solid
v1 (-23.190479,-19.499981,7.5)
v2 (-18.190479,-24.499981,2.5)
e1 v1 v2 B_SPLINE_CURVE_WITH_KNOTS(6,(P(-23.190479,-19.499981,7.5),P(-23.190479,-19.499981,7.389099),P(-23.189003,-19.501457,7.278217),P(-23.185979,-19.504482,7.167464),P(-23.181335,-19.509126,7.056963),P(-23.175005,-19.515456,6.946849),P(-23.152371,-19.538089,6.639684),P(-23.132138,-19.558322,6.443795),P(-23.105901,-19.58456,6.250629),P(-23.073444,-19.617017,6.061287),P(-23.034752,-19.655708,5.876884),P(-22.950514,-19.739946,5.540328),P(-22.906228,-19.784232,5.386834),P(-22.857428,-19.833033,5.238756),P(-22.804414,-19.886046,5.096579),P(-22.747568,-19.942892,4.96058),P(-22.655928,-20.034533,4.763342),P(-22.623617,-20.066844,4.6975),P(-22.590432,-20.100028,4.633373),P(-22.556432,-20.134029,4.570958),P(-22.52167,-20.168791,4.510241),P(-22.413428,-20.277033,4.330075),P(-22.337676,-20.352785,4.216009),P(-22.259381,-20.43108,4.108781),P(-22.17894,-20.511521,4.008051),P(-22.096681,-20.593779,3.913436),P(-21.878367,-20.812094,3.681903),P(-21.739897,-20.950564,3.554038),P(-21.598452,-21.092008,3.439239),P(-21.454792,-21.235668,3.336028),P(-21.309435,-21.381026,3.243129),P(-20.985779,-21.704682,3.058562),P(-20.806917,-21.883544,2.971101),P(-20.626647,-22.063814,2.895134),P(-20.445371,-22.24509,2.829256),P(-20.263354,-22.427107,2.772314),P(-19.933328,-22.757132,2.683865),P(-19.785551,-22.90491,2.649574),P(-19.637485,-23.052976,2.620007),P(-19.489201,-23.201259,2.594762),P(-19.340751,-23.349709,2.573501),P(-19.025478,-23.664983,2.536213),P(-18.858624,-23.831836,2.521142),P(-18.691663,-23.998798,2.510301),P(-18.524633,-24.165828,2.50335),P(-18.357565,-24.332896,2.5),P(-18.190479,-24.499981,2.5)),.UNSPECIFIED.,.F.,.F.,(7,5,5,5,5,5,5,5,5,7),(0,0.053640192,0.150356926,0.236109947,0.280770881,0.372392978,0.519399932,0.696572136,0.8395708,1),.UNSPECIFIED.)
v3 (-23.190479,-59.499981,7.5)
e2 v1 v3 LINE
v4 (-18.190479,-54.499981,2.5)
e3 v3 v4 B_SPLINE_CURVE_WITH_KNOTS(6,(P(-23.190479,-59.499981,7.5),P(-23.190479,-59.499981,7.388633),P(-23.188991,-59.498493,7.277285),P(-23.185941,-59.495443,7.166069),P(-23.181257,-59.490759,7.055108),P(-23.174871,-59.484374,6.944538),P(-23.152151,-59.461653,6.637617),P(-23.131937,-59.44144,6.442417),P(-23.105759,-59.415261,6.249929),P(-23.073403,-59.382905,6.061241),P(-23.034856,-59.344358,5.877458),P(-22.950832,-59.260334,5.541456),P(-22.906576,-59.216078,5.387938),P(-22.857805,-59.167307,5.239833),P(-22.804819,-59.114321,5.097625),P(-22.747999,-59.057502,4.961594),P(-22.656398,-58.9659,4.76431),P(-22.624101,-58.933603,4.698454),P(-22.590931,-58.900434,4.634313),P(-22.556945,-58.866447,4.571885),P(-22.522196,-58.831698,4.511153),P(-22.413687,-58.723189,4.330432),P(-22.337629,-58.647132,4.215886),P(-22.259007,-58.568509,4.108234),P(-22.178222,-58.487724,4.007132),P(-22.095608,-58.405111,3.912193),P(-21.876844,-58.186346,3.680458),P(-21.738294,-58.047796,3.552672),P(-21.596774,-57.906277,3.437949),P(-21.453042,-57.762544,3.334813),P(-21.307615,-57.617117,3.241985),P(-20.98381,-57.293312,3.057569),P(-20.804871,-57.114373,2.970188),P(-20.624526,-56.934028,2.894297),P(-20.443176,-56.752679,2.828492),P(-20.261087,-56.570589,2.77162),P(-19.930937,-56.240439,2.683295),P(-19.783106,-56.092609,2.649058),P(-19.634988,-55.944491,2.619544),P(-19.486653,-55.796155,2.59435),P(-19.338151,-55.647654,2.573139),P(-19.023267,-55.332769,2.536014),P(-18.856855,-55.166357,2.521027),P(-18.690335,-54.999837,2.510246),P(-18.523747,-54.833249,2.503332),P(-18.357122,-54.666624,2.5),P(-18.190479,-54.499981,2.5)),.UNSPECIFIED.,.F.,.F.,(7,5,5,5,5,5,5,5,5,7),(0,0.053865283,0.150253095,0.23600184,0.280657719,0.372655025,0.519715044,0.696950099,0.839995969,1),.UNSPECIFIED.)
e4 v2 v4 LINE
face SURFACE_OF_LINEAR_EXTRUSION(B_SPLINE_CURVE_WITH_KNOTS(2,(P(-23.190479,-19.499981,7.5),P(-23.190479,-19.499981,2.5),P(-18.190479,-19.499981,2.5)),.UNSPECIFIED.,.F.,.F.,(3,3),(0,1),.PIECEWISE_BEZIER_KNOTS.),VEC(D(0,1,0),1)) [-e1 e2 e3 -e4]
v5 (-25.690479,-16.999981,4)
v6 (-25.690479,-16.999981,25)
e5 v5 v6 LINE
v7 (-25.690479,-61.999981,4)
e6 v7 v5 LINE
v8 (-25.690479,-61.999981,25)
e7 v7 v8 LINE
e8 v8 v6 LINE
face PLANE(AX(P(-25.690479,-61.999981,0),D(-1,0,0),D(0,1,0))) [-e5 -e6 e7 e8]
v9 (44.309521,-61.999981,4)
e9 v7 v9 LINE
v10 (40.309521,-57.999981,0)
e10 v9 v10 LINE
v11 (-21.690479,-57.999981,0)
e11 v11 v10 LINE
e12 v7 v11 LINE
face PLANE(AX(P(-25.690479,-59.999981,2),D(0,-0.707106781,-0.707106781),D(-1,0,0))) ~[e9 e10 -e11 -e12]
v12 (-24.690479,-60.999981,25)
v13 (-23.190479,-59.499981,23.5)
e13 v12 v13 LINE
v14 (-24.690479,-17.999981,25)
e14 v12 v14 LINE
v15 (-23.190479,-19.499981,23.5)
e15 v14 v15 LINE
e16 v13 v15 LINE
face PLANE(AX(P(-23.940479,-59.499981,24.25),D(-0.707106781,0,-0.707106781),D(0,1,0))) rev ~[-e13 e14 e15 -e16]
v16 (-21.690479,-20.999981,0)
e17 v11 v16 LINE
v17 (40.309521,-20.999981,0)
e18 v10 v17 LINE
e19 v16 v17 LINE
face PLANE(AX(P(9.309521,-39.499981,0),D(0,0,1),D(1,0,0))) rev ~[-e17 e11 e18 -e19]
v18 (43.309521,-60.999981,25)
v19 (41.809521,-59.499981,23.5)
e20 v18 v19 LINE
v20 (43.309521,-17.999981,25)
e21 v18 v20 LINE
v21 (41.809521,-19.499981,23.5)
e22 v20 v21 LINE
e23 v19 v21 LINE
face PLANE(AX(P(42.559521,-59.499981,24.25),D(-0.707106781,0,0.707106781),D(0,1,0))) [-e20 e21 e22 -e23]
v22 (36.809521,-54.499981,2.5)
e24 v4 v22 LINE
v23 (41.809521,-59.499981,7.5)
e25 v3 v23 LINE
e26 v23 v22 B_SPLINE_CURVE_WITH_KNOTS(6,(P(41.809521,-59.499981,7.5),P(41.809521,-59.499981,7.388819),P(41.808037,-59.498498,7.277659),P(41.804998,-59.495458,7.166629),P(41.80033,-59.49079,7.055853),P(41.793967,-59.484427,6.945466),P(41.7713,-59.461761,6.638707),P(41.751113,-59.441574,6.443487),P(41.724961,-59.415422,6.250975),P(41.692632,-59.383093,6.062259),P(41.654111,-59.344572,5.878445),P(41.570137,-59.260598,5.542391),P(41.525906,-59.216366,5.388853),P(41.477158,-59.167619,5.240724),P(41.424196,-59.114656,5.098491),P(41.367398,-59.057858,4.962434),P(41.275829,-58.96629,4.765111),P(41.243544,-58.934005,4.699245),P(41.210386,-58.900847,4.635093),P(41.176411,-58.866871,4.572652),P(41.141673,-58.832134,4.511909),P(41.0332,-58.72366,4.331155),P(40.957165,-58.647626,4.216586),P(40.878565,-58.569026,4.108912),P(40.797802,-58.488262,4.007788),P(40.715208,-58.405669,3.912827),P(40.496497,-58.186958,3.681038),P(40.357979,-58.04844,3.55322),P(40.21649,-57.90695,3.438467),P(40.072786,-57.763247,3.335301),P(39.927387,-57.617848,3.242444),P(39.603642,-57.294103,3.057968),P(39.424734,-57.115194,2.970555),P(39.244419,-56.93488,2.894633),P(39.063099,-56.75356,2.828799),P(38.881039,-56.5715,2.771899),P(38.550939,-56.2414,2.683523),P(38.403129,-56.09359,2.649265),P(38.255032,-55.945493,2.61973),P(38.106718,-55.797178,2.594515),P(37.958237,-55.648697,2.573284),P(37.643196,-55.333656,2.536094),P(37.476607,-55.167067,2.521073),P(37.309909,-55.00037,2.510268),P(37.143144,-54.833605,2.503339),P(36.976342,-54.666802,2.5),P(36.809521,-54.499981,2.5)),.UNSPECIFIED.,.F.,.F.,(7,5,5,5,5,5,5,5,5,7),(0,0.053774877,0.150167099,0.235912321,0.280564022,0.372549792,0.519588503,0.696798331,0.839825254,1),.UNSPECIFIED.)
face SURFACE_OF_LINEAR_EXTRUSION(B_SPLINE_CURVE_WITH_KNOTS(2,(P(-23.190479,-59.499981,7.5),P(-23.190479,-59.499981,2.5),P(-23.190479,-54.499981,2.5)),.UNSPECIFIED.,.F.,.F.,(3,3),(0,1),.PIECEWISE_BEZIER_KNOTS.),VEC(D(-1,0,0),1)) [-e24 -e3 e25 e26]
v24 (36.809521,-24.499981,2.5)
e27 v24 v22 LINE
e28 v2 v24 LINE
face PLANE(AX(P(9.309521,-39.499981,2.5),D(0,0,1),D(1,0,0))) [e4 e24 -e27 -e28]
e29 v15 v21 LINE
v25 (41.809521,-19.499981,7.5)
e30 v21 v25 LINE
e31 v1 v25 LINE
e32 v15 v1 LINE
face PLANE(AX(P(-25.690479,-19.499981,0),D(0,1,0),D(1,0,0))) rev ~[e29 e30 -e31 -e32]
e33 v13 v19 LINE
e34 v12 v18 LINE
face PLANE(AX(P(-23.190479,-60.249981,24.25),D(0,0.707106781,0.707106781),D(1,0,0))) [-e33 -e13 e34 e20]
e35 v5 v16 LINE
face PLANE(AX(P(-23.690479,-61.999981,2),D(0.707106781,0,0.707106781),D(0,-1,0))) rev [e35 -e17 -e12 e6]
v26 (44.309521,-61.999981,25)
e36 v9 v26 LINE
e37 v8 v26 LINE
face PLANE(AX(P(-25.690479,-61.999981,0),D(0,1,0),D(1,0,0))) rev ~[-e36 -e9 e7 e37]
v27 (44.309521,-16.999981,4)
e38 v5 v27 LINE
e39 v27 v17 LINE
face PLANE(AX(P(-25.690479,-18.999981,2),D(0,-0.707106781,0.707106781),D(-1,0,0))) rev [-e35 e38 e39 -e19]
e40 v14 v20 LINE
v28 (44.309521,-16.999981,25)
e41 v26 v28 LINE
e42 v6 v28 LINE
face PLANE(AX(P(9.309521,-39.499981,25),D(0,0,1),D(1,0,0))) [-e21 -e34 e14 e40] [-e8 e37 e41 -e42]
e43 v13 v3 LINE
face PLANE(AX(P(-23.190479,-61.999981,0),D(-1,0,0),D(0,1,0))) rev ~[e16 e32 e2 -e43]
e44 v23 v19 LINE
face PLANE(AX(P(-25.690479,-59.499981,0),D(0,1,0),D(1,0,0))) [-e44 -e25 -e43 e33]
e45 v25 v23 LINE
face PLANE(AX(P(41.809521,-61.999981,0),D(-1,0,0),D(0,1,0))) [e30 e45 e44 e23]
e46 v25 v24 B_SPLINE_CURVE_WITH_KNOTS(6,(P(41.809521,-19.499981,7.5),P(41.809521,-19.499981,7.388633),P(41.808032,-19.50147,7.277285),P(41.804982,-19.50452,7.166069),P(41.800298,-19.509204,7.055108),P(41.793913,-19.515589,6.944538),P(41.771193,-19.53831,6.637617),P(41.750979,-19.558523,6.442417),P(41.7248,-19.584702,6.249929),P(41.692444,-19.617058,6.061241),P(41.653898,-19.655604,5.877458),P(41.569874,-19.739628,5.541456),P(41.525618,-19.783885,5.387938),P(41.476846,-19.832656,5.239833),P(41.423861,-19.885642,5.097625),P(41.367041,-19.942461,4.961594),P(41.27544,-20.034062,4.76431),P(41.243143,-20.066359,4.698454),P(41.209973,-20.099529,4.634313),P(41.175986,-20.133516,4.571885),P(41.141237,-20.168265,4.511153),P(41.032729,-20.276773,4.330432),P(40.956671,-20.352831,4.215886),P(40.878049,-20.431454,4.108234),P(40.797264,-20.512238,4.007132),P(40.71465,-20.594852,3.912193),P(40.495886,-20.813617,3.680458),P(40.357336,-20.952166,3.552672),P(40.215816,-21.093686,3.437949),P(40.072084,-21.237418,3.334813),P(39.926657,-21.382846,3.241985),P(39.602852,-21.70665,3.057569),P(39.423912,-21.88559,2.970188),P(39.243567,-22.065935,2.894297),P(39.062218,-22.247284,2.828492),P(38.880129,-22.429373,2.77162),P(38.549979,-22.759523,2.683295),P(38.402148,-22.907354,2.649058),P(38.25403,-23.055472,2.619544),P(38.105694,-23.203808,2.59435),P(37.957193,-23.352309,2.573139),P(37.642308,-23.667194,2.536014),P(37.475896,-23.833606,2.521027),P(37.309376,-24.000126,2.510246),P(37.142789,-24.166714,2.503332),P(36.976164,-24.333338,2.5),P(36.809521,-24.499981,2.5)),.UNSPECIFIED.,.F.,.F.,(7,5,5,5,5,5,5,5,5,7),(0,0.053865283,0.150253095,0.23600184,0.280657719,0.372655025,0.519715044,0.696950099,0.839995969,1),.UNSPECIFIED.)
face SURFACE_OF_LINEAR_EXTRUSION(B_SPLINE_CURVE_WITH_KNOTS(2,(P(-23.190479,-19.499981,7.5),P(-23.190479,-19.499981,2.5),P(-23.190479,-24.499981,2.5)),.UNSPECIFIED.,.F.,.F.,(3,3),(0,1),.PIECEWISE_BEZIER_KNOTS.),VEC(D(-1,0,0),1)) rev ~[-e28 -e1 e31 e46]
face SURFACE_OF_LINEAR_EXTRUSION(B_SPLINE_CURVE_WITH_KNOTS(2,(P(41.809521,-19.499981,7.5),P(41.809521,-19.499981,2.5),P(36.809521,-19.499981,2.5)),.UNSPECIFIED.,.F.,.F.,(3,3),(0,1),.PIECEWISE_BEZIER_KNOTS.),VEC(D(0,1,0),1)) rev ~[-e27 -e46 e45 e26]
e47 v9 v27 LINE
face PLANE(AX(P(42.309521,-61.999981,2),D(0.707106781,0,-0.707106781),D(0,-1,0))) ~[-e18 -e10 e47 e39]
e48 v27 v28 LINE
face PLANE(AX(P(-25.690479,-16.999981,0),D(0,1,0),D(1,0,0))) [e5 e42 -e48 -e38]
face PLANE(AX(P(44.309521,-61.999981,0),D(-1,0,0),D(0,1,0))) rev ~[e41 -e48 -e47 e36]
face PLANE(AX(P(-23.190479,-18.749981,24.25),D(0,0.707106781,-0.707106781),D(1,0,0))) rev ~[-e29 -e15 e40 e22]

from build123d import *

# Parameters (mm, degrees)
F0_W        = 70
F0_H        = 45
F1_DEPTH    = 25
F2_T        = -2.5
F3_T1_DEPTH = 40
F3_T3_DEPTH = 65
F4_SIZE     = 4
F5_SIZE     = 1.5


# Not quite as in the source:
# - a fillet or chamfer that OpenCascade refuses, or shapes differently, is made with other operations: its cross-section is extruded or revolved along the edge and cut away or added


with BuildPart() as f1:
    # F0 (on Top) → F1 (new body)
    with BuildSketch(Plane.XY):
        with Locations((9.3095207959, -39.4999814034)):
            Rectangle(F0_W, F0_H)
    extrude(amount=F1_DEPTH)

    # F2
    f2_openings = [f1.faces().sort_by_distance(p)[0] for p in [
        (9.309521, -39.499981, 25),
    ]]
    offset(amount=F2_T, openings=f2_openings)

    # F3: fillet of radius 5 on 4 edges, made by hand

    # F3_s2 → F3_t1 (join)
    with BuildSketch(Plane.XZ.offset(19.4999814034)):
        with BuildLine():
            add(Edge.make_bspline(
                [(-23.1904792041, 7.5), (-23.1904792041, 2.5), (-18.1904792041, 2.5)],
                knots=[0, 0, 0, 1, 1, 1], degree=2, weights=[1, 1, 1]))
            Line((-18.1904792041, 2.5), (-23.1904792041, 2.5))
            Line((-23.1904792041, 2.5), (-23.1904792041, 7.5))
        make_face()
        with BuildLine():
            add(Edge.make_bspline(
                [(41.8095207959, 7.5), (41.8095207959, 2.5), (36.8095207959, 2.5)],
                knots=[0, 0, 0, 1, 1, 1], degree=2, weights=[1, 1, 1]))
            Line((36.8095207959, 2.5), (41.8095207959, 2.5))
            Line((41.8095207959, 2.5), (41.8095207959, 7.5))
        make_face()
    extrude(amount=F3_T1_DEPTH)

    # F3_s4 → F3_t3 (join)
    with BuildSketch(Plane.YZ.offset(-23.1904792041)):
        with BuildLine():
            add(Edge.make_bspline(
                [(-19.4999814034, 7.5), (-19.4999814034, 2.5), (-24.4999814034, 2.5)],
                knots=[0, 0, 0, 1, 1, 1], degree=2, weights=[1, 1, 1]))
            Line((-24.4999814034, 2.5), (-19.4999814034, 2.5))
            Line((-19.4999814034, 2.5), (-19.4999814034, 7.5))
        make_face()
        with BuildLine():
            add(Edge.make_bspline(
                [(-59.4999814034, 7.5), (-59.4999814034, 2.5), (-54.4999814034, 2.5)],
                knots=[0, 0, 0, 1, 1, 1], degree=2, weights=[1, 1, 1]))
            Line((-54.4999814034, 2.5), (-59.4999814034, 2.5))
            Line((-59.4999814034, 2.5), (-59.4999814034, 7.5))
        make_face()
    extrude(amount=F3_T3_DEPTH)

    # F4
    f4_edges = [f1.edges().sort_by_distance(p)[0] for p in [
        (9.309521, -61.999981, 0),
        (-25.690479, -39.499981, 0),
        (44.309521, -39.499981, 0),
        (9.309521, -16.999981, 0),
    ]]
    chamfer(f4_edges, length=F4_SIZE)

    # F5
    f5_edges = [f1.edges().sort_by_distance(p)[0] for p in [
        (9.309521, -19.499981, 25),
        (-23.190479, -39.499981, 25),
        (9.309521, -59.499981, 25),
        (41.809521, -39.499981, 25),
    ]]
    chamfer(f5_edges, length=F5_SIZE)


solid = f1.part
